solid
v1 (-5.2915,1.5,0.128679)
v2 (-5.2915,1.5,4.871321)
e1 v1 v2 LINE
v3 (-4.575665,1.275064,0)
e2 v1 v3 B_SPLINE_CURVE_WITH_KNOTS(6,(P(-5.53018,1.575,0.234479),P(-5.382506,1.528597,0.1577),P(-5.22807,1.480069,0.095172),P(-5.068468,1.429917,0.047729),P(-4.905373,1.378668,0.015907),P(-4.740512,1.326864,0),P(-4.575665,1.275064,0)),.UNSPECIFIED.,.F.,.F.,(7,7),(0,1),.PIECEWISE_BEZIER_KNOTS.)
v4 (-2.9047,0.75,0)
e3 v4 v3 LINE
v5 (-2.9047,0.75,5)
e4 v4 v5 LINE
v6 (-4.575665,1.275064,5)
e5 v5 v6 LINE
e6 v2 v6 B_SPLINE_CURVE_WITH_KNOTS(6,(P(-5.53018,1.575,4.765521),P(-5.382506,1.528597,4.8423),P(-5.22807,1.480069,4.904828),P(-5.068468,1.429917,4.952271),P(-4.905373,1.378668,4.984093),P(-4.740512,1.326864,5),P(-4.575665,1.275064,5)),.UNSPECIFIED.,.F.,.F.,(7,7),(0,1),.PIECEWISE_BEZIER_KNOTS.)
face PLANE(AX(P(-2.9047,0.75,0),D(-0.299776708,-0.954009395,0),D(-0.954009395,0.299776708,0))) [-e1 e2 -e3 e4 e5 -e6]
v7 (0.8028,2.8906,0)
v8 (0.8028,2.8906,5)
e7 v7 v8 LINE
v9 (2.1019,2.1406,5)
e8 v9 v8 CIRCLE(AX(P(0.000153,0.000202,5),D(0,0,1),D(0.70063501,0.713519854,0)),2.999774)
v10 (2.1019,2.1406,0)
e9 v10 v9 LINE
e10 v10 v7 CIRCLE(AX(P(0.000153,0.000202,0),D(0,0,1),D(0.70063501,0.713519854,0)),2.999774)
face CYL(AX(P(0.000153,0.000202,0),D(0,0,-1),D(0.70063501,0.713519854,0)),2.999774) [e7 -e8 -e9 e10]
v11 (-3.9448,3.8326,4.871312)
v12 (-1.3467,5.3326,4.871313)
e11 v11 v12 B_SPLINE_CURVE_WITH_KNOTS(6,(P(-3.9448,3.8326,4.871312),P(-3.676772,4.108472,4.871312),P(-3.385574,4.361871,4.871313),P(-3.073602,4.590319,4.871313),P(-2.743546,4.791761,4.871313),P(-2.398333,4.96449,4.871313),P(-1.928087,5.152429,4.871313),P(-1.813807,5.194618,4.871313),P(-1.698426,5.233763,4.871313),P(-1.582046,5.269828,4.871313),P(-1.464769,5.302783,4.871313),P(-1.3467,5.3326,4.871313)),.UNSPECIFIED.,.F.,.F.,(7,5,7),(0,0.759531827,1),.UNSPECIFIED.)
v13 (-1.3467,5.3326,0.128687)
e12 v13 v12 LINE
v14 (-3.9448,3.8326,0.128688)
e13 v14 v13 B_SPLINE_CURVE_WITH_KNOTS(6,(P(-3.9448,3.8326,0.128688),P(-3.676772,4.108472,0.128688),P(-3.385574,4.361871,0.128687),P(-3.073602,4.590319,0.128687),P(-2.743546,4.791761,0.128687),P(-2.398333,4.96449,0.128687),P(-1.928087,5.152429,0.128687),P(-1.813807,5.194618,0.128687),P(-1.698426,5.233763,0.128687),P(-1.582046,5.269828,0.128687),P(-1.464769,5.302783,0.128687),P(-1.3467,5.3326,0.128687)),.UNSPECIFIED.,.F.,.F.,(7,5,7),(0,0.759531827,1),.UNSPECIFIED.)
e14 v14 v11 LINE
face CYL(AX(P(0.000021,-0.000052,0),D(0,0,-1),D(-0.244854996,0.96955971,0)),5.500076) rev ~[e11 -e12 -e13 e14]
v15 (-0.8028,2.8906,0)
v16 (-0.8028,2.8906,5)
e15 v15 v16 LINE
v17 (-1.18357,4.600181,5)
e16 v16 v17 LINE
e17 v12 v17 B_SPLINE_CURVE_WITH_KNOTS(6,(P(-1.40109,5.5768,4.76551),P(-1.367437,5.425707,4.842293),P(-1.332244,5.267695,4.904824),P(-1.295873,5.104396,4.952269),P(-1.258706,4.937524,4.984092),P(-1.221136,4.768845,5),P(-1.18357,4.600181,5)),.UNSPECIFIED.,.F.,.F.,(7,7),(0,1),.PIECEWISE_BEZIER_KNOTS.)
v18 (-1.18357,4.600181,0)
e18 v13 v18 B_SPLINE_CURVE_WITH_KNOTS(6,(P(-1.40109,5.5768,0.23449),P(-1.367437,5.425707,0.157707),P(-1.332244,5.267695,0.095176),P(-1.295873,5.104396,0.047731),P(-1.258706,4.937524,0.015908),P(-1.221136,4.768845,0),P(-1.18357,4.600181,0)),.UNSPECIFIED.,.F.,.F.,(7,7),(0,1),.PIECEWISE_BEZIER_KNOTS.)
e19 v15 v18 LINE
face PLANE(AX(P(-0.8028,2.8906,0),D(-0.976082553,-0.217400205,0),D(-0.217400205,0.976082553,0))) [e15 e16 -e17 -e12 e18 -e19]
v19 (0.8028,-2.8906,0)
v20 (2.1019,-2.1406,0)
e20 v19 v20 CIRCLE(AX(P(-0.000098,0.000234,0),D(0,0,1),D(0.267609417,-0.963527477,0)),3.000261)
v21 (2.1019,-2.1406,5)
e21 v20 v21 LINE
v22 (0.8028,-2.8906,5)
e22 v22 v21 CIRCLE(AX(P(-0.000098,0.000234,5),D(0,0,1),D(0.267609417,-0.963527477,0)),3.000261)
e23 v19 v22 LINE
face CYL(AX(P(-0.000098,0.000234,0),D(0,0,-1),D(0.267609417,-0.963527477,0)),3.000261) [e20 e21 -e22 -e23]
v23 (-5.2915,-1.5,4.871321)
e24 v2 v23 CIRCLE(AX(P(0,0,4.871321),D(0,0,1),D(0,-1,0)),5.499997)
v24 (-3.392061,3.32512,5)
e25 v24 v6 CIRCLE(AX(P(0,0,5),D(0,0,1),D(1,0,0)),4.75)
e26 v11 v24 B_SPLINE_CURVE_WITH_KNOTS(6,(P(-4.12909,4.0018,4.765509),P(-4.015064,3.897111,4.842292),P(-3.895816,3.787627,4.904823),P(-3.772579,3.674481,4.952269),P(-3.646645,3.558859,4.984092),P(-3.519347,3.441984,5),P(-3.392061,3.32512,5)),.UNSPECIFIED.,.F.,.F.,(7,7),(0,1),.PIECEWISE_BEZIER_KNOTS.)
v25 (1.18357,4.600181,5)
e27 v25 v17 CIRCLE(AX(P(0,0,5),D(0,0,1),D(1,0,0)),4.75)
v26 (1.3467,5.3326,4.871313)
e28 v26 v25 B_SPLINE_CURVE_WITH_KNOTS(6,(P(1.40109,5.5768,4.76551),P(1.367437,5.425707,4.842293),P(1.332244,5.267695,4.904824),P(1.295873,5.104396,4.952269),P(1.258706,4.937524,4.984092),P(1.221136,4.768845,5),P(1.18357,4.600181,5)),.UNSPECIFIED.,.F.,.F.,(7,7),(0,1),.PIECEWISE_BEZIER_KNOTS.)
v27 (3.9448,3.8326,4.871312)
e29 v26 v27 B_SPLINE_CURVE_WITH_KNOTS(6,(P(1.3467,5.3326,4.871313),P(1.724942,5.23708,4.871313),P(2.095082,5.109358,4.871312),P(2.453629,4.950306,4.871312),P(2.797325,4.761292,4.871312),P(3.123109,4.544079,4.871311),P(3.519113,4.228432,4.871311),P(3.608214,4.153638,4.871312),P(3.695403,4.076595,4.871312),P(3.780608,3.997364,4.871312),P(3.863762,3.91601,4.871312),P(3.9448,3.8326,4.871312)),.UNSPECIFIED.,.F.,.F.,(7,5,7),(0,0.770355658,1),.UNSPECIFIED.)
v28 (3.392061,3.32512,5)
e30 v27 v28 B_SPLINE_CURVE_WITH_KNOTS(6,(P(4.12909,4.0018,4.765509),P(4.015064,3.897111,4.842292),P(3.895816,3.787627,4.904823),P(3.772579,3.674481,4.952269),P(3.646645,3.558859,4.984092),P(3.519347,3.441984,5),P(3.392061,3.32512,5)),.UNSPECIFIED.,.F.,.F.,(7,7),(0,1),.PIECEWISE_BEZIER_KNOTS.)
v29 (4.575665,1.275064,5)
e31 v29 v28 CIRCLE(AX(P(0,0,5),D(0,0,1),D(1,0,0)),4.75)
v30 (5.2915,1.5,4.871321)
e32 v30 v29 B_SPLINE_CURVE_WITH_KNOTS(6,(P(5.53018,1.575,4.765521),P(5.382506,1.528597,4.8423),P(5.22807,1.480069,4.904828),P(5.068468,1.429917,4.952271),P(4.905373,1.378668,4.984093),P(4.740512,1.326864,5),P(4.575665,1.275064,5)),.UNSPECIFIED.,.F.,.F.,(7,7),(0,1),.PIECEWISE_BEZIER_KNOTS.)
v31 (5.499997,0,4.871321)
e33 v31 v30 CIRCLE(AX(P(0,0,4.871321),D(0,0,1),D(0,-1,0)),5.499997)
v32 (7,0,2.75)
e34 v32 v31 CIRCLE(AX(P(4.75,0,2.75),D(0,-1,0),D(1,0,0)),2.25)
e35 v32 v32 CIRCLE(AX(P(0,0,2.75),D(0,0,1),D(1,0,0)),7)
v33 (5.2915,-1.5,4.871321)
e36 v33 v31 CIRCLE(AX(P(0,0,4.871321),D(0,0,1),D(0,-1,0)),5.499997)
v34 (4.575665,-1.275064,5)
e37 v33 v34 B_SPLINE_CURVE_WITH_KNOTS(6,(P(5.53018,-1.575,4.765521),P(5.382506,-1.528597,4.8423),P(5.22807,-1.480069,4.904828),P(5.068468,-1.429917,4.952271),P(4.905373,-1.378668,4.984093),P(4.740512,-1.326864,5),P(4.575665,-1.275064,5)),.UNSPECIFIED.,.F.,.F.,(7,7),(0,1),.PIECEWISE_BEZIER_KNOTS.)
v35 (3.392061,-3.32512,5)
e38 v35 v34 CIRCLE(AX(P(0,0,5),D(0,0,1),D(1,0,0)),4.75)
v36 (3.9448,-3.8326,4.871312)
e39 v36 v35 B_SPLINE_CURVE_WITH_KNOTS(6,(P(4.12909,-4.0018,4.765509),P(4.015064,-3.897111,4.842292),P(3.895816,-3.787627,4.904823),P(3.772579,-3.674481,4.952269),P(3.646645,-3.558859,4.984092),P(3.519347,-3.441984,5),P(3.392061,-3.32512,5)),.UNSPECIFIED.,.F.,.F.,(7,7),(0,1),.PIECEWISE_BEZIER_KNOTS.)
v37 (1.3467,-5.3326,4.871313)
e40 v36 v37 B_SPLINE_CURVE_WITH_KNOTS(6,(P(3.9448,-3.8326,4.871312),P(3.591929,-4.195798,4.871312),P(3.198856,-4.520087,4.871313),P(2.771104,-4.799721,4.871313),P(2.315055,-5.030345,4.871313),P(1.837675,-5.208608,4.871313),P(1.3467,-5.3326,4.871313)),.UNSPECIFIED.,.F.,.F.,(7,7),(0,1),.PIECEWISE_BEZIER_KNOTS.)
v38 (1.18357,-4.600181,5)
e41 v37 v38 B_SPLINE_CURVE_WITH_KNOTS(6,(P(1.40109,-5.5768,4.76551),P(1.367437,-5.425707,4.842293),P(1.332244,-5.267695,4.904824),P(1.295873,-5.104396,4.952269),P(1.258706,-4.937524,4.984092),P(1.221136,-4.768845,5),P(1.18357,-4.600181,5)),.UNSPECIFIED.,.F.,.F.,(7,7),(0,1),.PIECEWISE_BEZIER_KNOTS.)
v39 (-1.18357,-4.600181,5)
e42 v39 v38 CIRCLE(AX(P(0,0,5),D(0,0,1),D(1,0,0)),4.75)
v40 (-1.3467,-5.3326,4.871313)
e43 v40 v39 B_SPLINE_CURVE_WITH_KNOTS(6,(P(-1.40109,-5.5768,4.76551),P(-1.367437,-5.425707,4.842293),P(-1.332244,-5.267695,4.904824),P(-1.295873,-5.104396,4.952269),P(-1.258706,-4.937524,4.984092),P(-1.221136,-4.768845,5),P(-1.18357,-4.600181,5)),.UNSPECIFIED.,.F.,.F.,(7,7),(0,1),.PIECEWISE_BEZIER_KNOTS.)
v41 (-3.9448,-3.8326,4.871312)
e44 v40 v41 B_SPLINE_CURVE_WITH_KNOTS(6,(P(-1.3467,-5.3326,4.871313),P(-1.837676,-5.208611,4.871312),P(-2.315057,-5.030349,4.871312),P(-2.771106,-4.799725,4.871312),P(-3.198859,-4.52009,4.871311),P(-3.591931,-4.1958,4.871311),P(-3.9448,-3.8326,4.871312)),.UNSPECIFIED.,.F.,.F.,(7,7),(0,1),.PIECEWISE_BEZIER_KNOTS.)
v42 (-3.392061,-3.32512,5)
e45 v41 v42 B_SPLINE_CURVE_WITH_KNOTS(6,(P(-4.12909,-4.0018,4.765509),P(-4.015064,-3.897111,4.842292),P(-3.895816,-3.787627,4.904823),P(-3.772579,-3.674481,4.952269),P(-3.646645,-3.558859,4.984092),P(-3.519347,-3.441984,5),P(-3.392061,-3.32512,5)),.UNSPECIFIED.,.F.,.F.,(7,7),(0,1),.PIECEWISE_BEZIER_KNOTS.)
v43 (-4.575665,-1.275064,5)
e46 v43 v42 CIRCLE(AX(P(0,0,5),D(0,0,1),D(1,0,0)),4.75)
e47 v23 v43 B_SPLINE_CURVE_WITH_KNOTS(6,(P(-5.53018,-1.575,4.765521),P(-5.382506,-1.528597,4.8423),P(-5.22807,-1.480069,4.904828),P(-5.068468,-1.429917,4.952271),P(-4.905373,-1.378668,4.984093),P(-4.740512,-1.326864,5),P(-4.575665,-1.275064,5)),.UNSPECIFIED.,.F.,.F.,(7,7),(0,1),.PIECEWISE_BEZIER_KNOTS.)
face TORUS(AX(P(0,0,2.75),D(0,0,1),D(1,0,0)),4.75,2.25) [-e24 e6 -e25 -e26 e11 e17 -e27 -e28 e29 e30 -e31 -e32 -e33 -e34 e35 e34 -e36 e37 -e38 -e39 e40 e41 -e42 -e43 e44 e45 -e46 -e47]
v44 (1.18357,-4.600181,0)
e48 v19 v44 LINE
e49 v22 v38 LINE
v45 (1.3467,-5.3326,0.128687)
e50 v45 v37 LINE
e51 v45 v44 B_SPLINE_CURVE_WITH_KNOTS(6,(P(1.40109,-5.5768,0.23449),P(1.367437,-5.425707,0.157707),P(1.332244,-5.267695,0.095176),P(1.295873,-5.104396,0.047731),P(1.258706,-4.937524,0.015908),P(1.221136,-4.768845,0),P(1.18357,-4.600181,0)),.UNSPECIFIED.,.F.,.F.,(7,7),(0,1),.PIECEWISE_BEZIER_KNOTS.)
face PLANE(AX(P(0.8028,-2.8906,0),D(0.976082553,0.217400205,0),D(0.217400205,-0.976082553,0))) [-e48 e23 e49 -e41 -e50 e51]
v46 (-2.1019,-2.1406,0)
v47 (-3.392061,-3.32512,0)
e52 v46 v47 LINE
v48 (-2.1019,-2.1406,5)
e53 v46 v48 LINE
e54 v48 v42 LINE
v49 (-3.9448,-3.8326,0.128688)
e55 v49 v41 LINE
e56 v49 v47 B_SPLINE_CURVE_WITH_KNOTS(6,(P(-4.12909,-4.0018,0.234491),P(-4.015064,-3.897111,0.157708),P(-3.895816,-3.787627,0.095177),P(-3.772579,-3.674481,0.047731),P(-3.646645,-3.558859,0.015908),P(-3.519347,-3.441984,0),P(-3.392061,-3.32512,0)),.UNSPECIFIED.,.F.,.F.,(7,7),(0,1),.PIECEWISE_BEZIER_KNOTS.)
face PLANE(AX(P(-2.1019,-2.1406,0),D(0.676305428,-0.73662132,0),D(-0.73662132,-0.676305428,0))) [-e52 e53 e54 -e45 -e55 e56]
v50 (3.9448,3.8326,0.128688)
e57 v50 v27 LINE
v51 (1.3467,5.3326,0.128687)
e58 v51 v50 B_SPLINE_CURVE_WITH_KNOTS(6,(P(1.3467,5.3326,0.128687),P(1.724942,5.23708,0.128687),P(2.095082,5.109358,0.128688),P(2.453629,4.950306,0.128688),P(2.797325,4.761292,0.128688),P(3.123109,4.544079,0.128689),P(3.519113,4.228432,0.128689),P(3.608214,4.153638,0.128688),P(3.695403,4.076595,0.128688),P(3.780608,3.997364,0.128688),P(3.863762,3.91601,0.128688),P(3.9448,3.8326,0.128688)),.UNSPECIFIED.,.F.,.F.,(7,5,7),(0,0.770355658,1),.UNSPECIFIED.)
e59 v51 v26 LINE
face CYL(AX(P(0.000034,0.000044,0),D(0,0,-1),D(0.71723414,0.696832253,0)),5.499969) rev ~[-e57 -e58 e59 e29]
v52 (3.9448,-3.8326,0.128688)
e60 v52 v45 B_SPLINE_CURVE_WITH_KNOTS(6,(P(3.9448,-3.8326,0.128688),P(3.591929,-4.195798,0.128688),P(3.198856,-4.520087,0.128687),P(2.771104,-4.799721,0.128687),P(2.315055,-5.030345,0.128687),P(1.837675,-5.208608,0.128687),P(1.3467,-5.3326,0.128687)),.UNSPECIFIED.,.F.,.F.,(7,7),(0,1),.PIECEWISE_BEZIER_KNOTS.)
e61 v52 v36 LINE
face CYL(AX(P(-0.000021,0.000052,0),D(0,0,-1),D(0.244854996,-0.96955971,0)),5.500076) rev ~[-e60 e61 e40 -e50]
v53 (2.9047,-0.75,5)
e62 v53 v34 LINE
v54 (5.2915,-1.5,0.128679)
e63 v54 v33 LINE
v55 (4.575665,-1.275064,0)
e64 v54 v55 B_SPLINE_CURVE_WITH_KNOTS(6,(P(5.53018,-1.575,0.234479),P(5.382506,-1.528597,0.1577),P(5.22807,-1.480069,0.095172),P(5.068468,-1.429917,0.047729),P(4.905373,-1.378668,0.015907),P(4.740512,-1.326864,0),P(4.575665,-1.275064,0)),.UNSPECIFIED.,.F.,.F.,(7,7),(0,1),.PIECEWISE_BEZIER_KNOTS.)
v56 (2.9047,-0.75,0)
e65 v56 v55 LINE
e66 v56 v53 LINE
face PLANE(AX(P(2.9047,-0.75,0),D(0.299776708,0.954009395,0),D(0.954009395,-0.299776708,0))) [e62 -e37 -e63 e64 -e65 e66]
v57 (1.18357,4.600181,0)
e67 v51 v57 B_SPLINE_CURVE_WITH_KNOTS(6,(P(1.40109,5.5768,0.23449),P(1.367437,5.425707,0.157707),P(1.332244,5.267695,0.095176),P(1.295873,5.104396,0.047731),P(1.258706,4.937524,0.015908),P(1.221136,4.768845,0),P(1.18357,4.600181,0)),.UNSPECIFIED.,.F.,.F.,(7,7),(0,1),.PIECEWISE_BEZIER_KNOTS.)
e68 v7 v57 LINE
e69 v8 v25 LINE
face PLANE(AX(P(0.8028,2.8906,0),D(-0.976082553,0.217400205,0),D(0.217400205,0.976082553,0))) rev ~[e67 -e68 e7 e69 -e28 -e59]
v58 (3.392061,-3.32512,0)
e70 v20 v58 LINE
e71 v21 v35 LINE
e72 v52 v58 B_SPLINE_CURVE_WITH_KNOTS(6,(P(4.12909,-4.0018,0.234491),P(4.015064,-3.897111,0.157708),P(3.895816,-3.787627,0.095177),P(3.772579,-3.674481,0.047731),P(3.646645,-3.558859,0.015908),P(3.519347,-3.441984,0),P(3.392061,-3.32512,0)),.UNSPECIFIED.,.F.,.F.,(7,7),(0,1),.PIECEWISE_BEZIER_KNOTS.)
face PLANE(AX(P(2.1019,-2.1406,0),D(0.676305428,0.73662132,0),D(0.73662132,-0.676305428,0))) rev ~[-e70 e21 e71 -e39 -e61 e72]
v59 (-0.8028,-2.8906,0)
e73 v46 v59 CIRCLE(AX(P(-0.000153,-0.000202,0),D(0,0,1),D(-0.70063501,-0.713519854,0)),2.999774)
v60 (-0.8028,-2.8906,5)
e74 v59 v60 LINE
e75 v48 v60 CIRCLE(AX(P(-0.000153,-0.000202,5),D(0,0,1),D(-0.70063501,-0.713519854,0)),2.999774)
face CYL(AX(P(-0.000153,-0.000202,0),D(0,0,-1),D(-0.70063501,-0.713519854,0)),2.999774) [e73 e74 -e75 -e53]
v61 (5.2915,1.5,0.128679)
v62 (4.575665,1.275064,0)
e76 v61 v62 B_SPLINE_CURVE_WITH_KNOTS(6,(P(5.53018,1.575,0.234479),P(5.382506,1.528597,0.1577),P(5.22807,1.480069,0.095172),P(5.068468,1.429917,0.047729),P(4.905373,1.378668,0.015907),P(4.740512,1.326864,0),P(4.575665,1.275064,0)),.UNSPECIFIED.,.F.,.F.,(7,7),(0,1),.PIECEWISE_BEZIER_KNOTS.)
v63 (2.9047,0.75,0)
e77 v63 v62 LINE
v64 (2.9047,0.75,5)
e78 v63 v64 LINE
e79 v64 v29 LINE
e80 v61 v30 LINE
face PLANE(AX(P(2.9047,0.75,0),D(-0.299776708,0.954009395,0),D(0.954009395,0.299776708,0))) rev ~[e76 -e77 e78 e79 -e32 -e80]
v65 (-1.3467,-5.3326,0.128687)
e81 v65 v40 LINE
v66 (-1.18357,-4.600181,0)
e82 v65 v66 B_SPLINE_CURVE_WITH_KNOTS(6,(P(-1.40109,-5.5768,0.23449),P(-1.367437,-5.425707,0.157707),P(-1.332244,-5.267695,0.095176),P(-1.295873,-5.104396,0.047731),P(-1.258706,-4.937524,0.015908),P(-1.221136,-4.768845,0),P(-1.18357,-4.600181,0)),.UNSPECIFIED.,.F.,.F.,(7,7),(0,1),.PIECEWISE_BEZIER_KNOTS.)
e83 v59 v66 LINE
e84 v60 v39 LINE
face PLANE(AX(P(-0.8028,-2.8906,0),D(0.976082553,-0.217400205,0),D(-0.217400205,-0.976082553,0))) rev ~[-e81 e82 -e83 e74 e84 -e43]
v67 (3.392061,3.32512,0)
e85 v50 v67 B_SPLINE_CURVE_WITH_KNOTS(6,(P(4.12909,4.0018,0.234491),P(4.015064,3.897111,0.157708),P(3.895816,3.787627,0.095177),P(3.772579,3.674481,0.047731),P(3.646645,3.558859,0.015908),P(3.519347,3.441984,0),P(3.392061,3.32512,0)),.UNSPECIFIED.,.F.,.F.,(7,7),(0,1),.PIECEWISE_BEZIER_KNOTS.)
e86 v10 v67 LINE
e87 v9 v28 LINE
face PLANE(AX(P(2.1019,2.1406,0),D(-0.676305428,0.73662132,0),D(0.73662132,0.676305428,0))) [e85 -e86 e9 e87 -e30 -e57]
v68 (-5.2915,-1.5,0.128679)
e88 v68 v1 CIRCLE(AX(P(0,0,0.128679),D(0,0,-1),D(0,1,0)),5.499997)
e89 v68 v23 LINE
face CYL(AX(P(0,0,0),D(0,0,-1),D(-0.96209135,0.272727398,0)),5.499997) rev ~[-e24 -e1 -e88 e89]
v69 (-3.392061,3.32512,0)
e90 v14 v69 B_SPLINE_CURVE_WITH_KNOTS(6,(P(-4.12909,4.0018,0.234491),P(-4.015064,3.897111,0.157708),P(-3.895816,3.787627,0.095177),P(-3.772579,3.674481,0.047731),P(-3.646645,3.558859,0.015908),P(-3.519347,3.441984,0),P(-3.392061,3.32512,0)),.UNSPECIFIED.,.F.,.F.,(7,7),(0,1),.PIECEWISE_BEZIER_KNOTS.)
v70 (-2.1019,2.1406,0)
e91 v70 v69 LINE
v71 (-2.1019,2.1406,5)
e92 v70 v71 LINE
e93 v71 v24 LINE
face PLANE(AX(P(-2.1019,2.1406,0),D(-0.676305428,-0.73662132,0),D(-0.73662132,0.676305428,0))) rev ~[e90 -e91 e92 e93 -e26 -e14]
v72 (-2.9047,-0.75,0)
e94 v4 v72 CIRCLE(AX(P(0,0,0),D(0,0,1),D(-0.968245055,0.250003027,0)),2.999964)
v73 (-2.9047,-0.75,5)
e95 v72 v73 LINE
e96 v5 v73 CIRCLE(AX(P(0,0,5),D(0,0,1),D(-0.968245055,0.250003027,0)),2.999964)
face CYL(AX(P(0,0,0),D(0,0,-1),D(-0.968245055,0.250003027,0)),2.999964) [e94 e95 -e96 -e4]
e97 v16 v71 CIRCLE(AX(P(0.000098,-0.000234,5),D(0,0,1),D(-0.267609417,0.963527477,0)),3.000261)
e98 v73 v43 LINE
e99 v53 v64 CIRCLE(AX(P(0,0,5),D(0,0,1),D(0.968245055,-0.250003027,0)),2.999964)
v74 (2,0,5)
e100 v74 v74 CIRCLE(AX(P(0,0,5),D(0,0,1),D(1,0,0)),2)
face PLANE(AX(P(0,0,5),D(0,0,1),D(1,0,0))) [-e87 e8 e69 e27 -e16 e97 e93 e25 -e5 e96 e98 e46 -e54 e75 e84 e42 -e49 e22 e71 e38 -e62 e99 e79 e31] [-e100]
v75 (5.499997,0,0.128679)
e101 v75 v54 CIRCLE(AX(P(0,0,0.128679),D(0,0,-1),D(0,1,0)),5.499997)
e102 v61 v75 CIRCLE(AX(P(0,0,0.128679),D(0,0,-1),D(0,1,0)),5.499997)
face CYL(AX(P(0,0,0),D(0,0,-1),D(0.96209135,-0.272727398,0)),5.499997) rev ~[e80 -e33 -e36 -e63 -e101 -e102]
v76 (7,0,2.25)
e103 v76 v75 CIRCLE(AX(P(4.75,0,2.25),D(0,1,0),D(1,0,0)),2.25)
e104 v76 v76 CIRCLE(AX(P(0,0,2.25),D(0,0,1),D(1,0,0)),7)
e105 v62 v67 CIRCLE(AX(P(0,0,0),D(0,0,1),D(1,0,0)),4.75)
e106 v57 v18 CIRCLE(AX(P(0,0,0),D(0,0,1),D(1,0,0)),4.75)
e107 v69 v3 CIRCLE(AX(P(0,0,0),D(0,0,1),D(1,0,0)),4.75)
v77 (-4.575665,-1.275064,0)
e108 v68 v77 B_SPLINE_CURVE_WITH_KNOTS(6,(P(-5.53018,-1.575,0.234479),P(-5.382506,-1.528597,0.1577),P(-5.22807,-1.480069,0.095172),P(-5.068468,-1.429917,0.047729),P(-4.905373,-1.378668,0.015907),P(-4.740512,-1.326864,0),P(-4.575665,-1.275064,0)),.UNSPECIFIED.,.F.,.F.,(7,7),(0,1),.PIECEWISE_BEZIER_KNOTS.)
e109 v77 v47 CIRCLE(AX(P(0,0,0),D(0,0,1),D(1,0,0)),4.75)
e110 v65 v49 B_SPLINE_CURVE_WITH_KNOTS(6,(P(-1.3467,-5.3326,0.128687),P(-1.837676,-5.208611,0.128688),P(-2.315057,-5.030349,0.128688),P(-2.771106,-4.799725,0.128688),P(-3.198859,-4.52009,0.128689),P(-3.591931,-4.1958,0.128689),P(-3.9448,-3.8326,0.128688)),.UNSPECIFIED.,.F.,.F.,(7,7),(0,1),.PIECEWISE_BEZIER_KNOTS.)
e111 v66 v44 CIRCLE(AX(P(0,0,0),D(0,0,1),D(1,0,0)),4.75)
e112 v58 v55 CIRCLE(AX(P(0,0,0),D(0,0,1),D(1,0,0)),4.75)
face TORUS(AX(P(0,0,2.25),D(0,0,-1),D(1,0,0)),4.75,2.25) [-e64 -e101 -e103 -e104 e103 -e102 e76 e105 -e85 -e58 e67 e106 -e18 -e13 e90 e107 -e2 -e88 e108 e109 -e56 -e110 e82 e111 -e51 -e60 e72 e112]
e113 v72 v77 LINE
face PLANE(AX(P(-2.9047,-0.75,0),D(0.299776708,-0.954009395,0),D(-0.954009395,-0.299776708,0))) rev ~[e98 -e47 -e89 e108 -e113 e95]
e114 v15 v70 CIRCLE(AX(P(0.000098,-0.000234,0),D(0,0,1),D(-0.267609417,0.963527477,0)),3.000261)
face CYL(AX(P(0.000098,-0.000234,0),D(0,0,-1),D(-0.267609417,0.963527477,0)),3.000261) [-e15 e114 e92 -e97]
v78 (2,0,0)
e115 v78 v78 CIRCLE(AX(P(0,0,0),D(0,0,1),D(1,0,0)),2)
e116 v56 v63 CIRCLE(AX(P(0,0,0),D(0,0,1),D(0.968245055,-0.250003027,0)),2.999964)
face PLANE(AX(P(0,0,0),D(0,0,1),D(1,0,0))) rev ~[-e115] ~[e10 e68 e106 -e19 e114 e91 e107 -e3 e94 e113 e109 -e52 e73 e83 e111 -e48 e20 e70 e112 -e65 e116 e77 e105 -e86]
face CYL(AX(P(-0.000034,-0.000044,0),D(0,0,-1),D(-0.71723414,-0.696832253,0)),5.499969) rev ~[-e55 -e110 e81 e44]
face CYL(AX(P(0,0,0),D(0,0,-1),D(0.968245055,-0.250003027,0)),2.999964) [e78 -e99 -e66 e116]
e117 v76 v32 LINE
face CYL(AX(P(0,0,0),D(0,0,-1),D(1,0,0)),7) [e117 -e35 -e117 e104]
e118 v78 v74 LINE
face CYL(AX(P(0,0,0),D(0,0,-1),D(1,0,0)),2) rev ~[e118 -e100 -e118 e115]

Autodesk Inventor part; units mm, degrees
ref_plane "YZ Plane" through (0, 0, 0) normal (1, 0, 0) x (0, 1, 0)
ref_plane "XZ Plane" through (0, 0, 0) normal (0, 1, 0) x (-1, 0, 0)
ref_plane "XY Plane" through (0, 0, 0) normal (0, 0, 1) x (1, 0, 0)
sketch "Sketch1" plane through (0, 0, 0) normal (0, 0, 1) x (1, 0, 0)
  circle A0 centre (0, 0) radius 2
  circle A1 centre (0, 0) radius 7
  circle A2 centre (0, 0) radius 3 construction
  circle A3 centre (0, 0) radius 5.5 construction
  line L0 (2.9047, 0.75) -> (5.2915, 1.5)
  line L1 (2.9047, -0.75) -> (5.2915, -1.5)
  arc A4 (2.9047, -0.75) -> (2.9047, 0.75) centre (0, 0) ccw
  arc A5 (5.2915, -1.5) -> (5.2915, 1.5) centre (0, 0) ccw
  line L2 (0, 0) -> (8.9421, 0) construction
  circle A6 centre (0, 0) radius 3 construction
  circle A7 centre (0, 0) radius 5.5 construction
  line L3 (0.8028, 2.8906) -> (1.3467, 5.3326)
  line L4 (2.1019, 2.1406) -> (3.9448, 3.8326)
  arc A8 (2.1019, 2.1406) -> (0.8028, 2.8906) centre (0, 0) ccw
  arc A9 (3.9448, 3.8326) -> (1.3467, 5.3326) centre (0, 0) ccw
  line L5 (0, 0) -> (4.471, 7.7441) construction
  circle A10 centre (0, 0) radius 3 construction
  circle A11 centre (0, 0) radius 5.5 construction
  line L6 (-2.1019, 2.1406) -> (-3.9448, 3.8326)
  line L7 (-0.8028, 2.8906) -> (-1.3467, 5.3326)
  arc A12 (-0.8028, 2.8906) -> (-2.1019, 2.1406) centre (0, 0) ccw
  arc A13 (-1.3467, 5.3326) -> (-3.9448, 3.8326) centre (0, 0) ccw
  line L8 (0, 0) -> (-4.471, 7.7441) construction
  circle A14 centre (0, 0) radius 3 construction
  circle A15 centre (0, 0) radius 5.5 construction
  line L9 (-2.9047, -0.75) -> (-5.2915, -1.5)
  line L10 (-2.9047, 0.75) -> (-5.2915, 1.5)
  arc A16 (-2.9047, 0.75) -> (-2.9047, -0.75) centre (0, 0) ccw
  arc A17 (-5.2915, 1.5) -> (-5.2915, -1.5) centre (0, 0) ccw
  line L11 (0, 0) -> (-8.9421, 0) construction
  circle A18 centre (0, 0) radius 3 construction
  circle A19 centre (0, 0) radius 5.5 construction
  line L12 (-0.8028, -2.8906) -> (-1.3467, -5.3326)
  line L13 (-2.1019, -2.1406) -> (-3.9448, -3.8326)
  arc A20 (-2.1019, -2.1406) -> (-0.8028, -2.8906) centre (0, 0) ccw
  arc A21 (-3.9448, -3.8326) -> (-1.3467, -5.3326) centre (0, 0) ccw
  line L14 (0, 0) -> (-4.471, -7.7441) construction
  circle A22 centre (0, 0) radius 3 construction
  circle A23 centre (0, 0) radius 5.5 construction
  line L15 (2.1019, -2.1406) -> (3.9448, -3.8326)
  line L16 (0.8028, -2.8906) -> (1.3467, -5.3326)
  arc A24 (0.8028, -2.8906) -> (2.1019, -2.1406) centre (0, 0) ccw
  arc A25 (1.3467, -5.3326) -> (3.9448, -3.8326) centre (0, 0) ccw
  line L17 (0, 0) -> (4.471, -7.7441) construction
  dimension "d0" = 4
  dimension "d1" = 14
  dimension "d2" = 6
  dimension "d3" = 11
  dimension "d4" = 0.75
  dimension "d5" = 0.75
  dimension "d8" = 360
extrude "Extrusion1" add sketch "Sketch1" along normal blind 5
fillet "Fillet1" radius 2.25 2 edges at (-7, 0, 5) (-7, 0, 0)
properties part number "Wheel" material "ABS Plastic"
